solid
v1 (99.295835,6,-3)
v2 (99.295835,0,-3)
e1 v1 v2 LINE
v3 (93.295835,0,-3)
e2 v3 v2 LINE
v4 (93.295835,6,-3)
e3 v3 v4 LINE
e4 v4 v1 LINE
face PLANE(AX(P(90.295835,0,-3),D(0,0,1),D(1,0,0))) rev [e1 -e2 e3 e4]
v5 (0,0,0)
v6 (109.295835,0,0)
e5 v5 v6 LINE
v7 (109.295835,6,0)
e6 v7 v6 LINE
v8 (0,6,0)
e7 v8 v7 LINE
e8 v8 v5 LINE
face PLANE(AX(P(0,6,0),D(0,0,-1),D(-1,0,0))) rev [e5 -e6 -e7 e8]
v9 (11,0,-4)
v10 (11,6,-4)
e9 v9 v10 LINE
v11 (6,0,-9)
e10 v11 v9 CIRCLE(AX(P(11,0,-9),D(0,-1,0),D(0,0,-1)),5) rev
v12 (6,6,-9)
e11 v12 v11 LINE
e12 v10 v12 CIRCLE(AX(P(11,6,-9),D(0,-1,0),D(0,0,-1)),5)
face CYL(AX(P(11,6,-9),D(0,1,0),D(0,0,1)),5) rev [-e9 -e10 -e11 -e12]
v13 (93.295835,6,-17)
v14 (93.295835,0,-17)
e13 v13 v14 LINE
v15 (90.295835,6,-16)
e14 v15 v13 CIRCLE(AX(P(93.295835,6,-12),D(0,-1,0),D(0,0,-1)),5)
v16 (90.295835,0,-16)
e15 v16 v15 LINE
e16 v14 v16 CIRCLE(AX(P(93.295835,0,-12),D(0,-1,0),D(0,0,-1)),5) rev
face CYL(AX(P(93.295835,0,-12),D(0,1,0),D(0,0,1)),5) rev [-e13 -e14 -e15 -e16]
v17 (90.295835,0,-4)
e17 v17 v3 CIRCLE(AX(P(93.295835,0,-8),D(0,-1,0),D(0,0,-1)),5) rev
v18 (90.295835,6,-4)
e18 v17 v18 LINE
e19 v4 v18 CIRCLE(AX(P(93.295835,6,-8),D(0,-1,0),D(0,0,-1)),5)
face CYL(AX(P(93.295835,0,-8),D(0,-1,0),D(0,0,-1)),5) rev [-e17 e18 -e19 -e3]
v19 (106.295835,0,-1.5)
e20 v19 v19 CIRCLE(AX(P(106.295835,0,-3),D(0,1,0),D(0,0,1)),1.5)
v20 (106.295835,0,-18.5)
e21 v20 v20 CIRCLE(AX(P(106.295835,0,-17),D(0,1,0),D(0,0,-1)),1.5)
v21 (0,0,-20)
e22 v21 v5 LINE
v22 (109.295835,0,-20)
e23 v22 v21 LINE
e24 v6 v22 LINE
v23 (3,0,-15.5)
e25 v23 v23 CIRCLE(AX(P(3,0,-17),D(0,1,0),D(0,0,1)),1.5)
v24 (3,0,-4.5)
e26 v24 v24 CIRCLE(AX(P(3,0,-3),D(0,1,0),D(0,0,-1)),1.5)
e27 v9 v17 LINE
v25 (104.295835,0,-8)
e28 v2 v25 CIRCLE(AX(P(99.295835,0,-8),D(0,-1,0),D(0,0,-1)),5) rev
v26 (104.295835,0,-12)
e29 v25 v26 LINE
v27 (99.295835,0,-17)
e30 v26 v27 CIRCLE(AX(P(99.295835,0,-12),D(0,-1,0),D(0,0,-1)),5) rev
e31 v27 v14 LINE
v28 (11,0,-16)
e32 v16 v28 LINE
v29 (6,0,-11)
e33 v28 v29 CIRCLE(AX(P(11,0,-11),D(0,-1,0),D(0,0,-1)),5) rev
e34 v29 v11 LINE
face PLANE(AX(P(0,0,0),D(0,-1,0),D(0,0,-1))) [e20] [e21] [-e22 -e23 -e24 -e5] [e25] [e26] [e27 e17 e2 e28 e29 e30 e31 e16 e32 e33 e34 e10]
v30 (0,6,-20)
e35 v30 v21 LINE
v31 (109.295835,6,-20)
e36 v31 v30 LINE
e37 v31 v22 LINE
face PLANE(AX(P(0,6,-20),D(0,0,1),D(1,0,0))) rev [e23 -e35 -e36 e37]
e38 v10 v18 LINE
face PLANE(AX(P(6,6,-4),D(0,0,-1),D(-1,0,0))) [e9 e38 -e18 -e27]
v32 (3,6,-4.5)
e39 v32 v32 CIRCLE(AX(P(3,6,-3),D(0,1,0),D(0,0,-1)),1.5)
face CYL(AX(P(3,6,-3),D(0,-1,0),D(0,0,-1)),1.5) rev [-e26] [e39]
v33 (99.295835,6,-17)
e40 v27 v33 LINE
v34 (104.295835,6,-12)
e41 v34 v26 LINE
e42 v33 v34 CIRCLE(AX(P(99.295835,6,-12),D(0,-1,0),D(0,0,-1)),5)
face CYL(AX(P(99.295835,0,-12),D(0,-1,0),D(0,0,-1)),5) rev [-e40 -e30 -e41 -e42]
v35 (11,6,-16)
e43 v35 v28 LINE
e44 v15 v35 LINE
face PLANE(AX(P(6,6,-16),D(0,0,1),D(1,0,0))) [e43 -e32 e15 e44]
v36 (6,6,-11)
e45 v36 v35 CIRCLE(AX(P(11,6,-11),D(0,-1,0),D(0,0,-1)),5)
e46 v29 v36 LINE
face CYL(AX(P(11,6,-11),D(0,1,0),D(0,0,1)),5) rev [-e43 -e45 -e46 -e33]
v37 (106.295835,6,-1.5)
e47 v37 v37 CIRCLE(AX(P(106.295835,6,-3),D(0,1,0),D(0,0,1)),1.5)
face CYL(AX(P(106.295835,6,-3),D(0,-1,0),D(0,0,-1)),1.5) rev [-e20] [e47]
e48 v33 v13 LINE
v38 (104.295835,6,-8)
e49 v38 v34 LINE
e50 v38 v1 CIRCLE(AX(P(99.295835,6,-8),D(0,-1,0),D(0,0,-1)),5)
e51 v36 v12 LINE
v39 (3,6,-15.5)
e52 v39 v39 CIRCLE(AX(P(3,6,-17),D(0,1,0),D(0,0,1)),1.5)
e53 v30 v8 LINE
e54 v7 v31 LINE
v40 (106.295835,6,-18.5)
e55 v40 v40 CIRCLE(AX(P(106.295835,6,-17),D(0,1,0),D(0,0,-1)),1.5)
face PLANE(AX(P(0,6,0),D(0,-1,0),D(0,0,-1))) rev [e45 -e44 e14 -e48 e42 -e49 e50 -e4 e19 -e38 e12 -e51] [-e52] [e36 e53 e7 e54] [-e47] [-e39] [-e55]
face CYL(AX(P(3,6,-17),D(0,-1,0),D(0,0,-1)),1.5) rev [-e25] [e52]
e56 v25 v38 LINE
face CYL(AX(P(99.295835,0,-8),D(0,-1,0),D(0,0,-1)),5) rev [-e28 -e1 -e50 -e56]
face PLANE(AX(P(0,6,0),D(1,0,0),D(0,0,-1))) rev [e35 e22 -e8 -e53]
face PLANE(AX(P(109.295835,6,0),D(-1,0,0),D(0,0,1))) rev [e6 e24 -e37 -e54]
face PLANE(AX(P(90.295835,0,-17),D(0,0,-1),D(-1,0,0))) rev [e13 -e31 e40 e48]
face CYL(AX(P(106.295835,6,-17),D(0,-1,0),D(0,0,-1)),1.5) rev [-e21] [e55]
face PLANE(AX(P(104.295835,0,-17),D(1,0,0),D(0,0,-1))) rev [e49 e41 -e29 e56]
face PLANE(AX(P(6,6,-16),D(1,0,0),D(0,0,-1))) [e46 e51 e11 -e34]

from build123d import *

# Parameters (mm, degrees)
SKETCH1_W           = 109.295835398
SKETCH1_H           = 20
SKETCH1_R           = 1.5
SKETCH1_W_2         = 97.295835398
SKETCH1_H_2         = 12
BOSS_EXTRUDE1_DEPTH = 6
CUT_EXTRUDE1_DEPTH  = 112.272546639
FILLET1_R           = 5


with BuildPart() as part:
    # Sketch1 → Boss-Extrude1 (new body)
    with BuildSketch(Plane(origin=(0, 0, 0), x_dir=(1, 0, 0), z_dir=(0, 1, 0))):
        with Locations((54.647917699, 10)):
            Rectangle(SKETCH1_W, SKETCH1_H)
        with Locations(Location((3, 17, 0), (0, 0, 270))):
            Circle(SKETCH1_R, mode=Mode.SUBTRACT)
        with Locations(Location((3, 3, 0), (0, 0, 90))):
            Circle(SKETCH1_R, mode=Mode.SUBTRACT)
        with Locations(Location((106.295835398, 3, 0), (0, 0, 270))):
            Circle(SKETCH1_R, mode=Mode.SUBTRACT)
        with Locations(Location((106.295835398, 17, 0), (0, 0, 90))):
            Circle(SKETCH1_R, mode=Mode.SUBTRACT)
        with Locations((54.647917699, 10)):
            Rectangle(SKETCH1_W_2, SKETCH1_H_2, mode=Mode.SUBTRACT)
    extrude(amount=BOSS_EXTRUDE1_DEPTH)

    # Sketch2 → Cut-Extrude1 (cut, through all)
    with BuildSketch(Plane(origin=(0, 6, 0), x_dir=(1, 0, 0), z_dir=(0, 1, 0))):
        Polygon((90.295835398, 17), (90.295835398, 16), (103.295835398, 16), (103.295835398, 4), (90.295835398, 4), (90.295835398, 3), (104.295835398, 3), (104.295835398, 17), align=None)
    extrude(amount=-CUT_EXTRUDE1_DEPTH, mode=Mode.SUBTRACT)

    # Fillet1
    # the kernel refuses this fillet: 5 mm, written as the material it adds along each edge
    with BuildSketch(Plane(origin=(104.295835398, 6, -17), x_dir=(0, 0, 1), z_dir=(0, -1, 0)), Plane(origin=(104.295835398, 6, -3), x_dir=(-1, 0, 0), z_dir=(0, -1, 0)), Plane(origin=(6, 0, -16), x_dir=(0, 0, 1), z_dir=(0, 1, 0))) as fillet1_piece_1:
        with BuildLine():
            CenterArc((FILLET1_R, FILLET1_R), FILLET1_R, 180, 90)
            Line((0, FILLET1_R), (-FILLET1_R * 0.02, FILLET1_R))
            Line((-FILLET1_R * 0.02, FILLET1_R), (-FILLET1_R * 0.02, -FILLET1_R * 0.02))
            Line((-FILLET1_R * 0.02, -FILLET1_R * 0.02), (FILLET1_R, -FILLET1_R * 0.02))
            Line((FILLET1_R, -FILLET1_R * 0.02), (FILLET1_R, 0))
        make_face()
    extrude(amount=6)
    with BuildSketch(Plane(origin=(90.295835398, 6, -17), x_dir=(1, 0, 0), z_dir=(0, -1, 0))) as fillet1_piece_2:
        with BuildLine():
            CenterArc((3, 5), FILLET1_R, 233.130102354, 36.869897646)
            Line((0, 1), (-0.06, 0.92))
            ThreePointArc((-0.06, 0.92), (-0.1, 0.5), (-0.1, 0))
            Line((-0.1, 0), (0, -0.1))
            Line((0, -0.1), (3, -0.1))
            Line((3, -0.1), (3, 0))
        make_face()
    extrude(amount=6)
    with BuildSketch(Plane(origin=(90.295835398, 6, -3), x_dir=(0, 0, -1), z_dir=(0, -1, 0))) as fillet1_piece_3:
        with BuildLine():
            CenterArc((5, 3), FILLET1_R, 180, 36.869897646)
            Line((0, 3), (-0.1, 3))
            Line((-0.1, 3), (-0.1, 0))
            Line((-0.1, 0), (0, -0.1))
            ThreePointArc((0, -0.1), (0.5, -0.1), (0.92, -0.06))
            Line((0.92, -0.06), (1, 0))
        make_face()
    extrude(amount=6)
    with BuildSketch(Plane(origin=(6, 0, -4), x_dir=(0, 0, -1), z_dir=(0, 1, 0))) as fillet1_piece_4:
        with BuildLine():
            CenterArc((FILLET1_R, -FILLET1_R), FILLET1_R, 90, 90)
            Line((0, -FILLET1_R), (-FILLET1_R * 0.02, -FILLET1_R))
            Line((-FILLET1_R * 0.02, -FILLET1_R), (-FILLET1_R * 0.02, FILLET1_R * 0.02))
            Line((-FILLET1_R * 0.02, FILLET1_R * 0.02), (FILLET1_R, FILLET1_R * 0.02))
            Line((FILLET1_R, FILLET1_R * 0.02), (FILLET1_R, 0))
        make_face()
    extrude(amount=6)


solid = part.part
